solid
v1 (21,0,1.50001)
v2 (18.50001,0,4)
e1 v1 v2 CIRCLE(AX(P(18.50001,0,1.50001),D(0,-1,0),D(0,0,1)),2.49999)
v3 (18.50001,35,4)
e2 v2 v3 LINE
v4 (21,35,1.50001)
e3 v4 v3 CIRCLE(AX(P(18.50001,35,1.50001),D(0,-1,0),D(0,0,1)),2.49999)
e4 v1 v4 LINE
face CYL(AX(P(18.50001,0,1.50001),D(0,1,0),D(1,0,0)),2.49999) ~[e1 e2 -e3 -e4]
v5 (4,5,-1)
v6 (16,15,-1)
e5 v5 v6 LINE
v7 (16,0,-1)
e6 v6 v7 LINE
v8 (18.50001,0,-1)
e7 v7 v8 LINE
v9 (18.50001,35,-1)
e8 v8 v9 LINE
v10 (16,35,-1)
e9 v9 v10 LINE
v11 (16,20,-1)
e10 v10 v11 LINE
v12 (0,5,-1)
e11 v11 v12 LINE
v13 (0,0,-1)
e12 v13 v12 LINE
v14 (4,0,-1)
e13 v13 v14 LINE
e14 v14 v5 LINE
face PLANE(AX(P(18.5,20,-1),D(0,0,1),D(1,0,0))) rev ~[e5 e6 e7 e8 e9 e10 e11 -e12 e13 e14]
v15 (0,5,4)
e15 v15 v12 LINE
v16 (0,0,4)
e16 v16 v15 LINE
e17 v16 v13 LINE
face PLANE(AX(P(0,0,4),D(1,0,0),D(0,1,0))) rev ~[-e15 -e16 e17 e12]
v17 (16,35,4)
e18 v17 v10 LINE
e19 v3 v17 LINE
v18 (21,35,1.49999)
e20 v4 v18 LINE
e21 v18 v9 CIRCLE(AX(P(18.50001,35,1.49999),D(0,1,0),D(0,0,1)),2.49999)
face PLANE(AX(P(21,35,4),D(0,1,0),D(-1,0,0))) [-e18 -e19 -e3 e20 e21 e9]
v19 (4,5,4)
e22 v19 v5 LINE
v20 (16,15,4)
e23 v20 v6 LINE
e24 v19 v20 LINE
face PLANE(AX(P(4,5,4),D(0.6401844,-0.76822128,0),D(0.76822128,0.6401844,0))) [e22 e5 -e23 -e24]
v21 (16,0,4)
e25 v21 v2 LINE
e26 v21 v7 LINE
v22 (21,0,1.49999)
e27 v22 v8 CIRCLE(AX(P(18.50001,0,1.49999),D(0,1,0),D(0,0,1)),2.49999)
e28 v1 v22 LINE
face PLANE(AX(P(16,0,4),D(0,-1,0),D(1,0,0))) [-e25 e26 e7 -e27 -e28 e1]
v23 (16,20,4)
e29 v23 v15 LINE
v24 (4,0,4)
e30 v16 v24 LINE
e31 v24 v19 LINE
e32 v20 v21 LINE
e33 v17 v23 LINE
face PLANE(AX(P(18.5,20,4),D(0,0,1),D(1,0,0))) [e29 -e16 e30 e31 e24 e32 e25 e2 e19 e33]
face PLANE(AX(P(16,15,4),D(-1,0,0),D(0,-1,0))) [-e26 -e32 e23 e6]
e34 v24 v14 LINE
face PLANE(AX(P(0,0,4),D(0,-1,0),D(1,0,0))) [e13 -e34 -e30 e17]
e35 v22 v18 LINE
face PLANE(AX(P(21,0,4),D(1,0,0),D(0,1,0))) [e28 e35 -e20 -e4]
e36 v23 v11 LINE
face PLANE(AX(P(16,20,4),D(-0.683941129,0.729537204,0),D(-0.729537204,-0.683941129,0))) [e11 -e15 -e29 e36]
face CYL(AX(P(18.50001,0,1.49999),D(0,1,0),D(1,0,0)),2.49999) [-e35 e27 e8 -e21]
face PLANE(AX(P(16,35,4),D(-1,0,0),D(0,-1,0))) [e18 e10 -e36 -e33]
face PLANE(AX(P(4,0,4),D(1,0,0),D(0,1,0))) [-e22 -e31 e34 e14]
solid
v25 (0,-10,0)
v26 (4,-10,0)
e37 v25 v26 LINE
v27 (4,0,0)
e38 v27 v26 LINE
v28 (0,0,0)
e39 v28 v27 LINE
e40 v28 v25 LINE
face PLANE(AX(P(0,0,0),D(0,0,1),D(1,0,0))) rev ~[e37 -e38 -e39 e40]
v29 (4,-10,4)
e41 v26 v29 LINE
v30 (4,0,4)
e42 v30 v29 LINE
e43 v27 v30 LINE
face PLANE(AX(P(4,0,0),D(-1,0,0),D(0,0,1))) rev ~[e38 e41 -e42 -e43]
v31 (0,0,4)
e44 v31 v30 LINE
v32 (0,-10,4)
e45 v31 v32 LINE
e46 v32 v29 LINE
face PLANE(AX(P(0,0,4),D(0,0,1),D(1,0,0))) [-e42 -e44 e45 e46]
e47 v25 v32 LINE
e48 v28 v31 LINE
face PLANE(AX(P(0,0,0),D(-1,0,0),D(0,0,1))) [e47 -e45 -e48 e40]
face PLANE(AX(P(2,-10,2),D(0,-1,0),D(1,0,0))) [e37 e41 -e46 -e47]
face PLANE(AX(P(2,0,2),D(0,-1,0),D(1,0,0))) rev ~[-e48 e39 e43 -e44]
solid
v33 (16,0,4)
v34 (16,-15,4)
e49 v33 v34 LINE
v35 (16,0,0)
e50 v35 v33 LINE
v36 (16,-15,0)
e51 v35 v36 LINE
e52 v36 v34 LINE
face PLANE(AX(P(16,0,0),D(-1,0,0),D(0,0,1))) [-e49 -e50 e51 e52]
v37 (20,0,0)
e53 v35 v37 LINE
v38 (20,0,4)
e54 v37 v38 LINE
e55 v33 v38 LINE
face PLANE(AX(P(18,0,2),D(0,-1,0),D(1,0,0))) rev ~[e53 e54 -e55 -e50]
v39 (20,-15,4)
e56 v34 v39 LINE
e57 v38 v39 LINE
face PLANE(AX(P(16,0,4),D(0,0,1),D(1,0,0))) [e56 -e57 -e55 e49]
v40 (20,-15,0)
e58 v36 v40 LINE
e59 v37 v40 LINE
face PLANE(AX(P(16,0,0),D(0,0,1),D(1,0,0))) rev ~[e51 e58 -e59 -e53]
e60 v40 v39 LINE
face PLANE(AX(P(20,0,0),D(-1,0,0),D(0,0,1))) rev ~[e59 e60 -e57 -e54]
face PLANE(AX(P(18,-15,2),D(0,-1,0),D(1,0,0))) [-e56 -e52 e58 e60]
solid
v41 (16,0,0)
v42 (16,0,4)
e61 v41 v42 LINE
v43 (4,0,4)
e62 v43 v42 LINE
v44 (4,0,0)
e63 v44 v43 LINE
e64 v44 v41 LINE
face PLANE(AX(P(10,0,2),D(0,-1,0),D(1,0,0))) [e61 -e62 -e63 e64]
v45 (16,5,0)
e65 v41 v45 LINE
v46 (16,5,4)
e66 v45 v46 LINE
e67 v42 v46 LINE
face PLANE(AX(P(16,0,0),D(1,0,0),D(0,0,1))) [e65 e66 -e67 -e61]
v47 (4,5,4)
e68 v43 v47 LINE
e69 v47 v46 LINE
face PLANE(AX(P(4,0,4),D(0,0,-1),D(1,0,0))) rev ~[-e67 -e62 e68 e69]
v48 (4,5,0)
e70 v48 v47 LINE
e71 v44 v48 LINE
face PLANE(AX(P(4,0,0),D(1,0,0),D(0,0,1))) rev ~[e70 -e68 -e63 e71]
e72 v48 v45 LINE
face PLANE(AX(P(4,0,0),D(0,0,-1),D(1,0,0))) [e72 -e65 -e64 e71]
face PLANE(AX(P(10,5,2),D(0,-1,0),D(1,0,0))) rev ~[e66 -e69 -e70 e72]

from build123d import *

# Parameters (mm, degrees)
F0_W     = 4
F0_H     = 4
F1_DEPTH = 10
F2_DEPTH = 15
F0_W_2   = 12
F3_DEPTH = 5
F4_W     = 4
F4_H     = 5
F4_W_2   = 5
F5_DEPTH = 5
F6_R     = 2.49999


# Not quite as in the source:
# - a fillet or chamfer is up to 0.001 mm smaller than in the source, because OpenCascade refuses the exact size


with BuildPart() as f1:
    # F0 (on Front) → F1 (new body)
    with BuildSketch(Plane.XZ):
        with Locations((2, 2)):
            Rectangle(F0_W, F0_H)
    extrude(amount=F1_DEPTH)


with BuildPart() as f2:
    # F0 (on Front) → F2 (new body)
    with BuildSketch(Plane.XZ):
        with Locations((18, 2)):
            Rectangle(F0_W, F0_H)
    extrude(amount=F2_DEPTH)


with BuildPart() as f3:
    # F0 (on Front) → F3 (new body)
    with BuildSketch(Plane.XZ):
        with Locations((10, 2)):
            Rectangle(F0_W_2, F0_H)
    extrude(amount=-F3_DEPTH)


with BuildPart() as f5:
    # F4 (on face) → F5 (new body)
    with BuildSketch(Plane.XY.offset(4)):
        Polygon((16, 15), (16, 5), (21, 5), (21, 35), (16, 35), (16, 20), align=None)
        with Locations((2, 2.5)):
            Rectangle(F4_W, F4_H)
        Polygon((4, 5), (16, 15), (16, 20), (0, 5), align=None)
        with Locations((18.5, 2.5)):
            Rectangle(F4_W_2, F4_H)
    extrude(amount=-F5_DEPTH)

    # F6 (radius 2.5 in the source; OpenCascade refuses exactly that, so slightly less here)
    f6_edges = [f5.edges().sort_by_distance(p)[0] for p in [
        (21, 17.5, -1),
        (21, 17.5, 4),
    ]]
    fillet(f6_edges, radius=F6_R)


solid = Compound([f1.part, f2.part, f3.part, f5.part])
